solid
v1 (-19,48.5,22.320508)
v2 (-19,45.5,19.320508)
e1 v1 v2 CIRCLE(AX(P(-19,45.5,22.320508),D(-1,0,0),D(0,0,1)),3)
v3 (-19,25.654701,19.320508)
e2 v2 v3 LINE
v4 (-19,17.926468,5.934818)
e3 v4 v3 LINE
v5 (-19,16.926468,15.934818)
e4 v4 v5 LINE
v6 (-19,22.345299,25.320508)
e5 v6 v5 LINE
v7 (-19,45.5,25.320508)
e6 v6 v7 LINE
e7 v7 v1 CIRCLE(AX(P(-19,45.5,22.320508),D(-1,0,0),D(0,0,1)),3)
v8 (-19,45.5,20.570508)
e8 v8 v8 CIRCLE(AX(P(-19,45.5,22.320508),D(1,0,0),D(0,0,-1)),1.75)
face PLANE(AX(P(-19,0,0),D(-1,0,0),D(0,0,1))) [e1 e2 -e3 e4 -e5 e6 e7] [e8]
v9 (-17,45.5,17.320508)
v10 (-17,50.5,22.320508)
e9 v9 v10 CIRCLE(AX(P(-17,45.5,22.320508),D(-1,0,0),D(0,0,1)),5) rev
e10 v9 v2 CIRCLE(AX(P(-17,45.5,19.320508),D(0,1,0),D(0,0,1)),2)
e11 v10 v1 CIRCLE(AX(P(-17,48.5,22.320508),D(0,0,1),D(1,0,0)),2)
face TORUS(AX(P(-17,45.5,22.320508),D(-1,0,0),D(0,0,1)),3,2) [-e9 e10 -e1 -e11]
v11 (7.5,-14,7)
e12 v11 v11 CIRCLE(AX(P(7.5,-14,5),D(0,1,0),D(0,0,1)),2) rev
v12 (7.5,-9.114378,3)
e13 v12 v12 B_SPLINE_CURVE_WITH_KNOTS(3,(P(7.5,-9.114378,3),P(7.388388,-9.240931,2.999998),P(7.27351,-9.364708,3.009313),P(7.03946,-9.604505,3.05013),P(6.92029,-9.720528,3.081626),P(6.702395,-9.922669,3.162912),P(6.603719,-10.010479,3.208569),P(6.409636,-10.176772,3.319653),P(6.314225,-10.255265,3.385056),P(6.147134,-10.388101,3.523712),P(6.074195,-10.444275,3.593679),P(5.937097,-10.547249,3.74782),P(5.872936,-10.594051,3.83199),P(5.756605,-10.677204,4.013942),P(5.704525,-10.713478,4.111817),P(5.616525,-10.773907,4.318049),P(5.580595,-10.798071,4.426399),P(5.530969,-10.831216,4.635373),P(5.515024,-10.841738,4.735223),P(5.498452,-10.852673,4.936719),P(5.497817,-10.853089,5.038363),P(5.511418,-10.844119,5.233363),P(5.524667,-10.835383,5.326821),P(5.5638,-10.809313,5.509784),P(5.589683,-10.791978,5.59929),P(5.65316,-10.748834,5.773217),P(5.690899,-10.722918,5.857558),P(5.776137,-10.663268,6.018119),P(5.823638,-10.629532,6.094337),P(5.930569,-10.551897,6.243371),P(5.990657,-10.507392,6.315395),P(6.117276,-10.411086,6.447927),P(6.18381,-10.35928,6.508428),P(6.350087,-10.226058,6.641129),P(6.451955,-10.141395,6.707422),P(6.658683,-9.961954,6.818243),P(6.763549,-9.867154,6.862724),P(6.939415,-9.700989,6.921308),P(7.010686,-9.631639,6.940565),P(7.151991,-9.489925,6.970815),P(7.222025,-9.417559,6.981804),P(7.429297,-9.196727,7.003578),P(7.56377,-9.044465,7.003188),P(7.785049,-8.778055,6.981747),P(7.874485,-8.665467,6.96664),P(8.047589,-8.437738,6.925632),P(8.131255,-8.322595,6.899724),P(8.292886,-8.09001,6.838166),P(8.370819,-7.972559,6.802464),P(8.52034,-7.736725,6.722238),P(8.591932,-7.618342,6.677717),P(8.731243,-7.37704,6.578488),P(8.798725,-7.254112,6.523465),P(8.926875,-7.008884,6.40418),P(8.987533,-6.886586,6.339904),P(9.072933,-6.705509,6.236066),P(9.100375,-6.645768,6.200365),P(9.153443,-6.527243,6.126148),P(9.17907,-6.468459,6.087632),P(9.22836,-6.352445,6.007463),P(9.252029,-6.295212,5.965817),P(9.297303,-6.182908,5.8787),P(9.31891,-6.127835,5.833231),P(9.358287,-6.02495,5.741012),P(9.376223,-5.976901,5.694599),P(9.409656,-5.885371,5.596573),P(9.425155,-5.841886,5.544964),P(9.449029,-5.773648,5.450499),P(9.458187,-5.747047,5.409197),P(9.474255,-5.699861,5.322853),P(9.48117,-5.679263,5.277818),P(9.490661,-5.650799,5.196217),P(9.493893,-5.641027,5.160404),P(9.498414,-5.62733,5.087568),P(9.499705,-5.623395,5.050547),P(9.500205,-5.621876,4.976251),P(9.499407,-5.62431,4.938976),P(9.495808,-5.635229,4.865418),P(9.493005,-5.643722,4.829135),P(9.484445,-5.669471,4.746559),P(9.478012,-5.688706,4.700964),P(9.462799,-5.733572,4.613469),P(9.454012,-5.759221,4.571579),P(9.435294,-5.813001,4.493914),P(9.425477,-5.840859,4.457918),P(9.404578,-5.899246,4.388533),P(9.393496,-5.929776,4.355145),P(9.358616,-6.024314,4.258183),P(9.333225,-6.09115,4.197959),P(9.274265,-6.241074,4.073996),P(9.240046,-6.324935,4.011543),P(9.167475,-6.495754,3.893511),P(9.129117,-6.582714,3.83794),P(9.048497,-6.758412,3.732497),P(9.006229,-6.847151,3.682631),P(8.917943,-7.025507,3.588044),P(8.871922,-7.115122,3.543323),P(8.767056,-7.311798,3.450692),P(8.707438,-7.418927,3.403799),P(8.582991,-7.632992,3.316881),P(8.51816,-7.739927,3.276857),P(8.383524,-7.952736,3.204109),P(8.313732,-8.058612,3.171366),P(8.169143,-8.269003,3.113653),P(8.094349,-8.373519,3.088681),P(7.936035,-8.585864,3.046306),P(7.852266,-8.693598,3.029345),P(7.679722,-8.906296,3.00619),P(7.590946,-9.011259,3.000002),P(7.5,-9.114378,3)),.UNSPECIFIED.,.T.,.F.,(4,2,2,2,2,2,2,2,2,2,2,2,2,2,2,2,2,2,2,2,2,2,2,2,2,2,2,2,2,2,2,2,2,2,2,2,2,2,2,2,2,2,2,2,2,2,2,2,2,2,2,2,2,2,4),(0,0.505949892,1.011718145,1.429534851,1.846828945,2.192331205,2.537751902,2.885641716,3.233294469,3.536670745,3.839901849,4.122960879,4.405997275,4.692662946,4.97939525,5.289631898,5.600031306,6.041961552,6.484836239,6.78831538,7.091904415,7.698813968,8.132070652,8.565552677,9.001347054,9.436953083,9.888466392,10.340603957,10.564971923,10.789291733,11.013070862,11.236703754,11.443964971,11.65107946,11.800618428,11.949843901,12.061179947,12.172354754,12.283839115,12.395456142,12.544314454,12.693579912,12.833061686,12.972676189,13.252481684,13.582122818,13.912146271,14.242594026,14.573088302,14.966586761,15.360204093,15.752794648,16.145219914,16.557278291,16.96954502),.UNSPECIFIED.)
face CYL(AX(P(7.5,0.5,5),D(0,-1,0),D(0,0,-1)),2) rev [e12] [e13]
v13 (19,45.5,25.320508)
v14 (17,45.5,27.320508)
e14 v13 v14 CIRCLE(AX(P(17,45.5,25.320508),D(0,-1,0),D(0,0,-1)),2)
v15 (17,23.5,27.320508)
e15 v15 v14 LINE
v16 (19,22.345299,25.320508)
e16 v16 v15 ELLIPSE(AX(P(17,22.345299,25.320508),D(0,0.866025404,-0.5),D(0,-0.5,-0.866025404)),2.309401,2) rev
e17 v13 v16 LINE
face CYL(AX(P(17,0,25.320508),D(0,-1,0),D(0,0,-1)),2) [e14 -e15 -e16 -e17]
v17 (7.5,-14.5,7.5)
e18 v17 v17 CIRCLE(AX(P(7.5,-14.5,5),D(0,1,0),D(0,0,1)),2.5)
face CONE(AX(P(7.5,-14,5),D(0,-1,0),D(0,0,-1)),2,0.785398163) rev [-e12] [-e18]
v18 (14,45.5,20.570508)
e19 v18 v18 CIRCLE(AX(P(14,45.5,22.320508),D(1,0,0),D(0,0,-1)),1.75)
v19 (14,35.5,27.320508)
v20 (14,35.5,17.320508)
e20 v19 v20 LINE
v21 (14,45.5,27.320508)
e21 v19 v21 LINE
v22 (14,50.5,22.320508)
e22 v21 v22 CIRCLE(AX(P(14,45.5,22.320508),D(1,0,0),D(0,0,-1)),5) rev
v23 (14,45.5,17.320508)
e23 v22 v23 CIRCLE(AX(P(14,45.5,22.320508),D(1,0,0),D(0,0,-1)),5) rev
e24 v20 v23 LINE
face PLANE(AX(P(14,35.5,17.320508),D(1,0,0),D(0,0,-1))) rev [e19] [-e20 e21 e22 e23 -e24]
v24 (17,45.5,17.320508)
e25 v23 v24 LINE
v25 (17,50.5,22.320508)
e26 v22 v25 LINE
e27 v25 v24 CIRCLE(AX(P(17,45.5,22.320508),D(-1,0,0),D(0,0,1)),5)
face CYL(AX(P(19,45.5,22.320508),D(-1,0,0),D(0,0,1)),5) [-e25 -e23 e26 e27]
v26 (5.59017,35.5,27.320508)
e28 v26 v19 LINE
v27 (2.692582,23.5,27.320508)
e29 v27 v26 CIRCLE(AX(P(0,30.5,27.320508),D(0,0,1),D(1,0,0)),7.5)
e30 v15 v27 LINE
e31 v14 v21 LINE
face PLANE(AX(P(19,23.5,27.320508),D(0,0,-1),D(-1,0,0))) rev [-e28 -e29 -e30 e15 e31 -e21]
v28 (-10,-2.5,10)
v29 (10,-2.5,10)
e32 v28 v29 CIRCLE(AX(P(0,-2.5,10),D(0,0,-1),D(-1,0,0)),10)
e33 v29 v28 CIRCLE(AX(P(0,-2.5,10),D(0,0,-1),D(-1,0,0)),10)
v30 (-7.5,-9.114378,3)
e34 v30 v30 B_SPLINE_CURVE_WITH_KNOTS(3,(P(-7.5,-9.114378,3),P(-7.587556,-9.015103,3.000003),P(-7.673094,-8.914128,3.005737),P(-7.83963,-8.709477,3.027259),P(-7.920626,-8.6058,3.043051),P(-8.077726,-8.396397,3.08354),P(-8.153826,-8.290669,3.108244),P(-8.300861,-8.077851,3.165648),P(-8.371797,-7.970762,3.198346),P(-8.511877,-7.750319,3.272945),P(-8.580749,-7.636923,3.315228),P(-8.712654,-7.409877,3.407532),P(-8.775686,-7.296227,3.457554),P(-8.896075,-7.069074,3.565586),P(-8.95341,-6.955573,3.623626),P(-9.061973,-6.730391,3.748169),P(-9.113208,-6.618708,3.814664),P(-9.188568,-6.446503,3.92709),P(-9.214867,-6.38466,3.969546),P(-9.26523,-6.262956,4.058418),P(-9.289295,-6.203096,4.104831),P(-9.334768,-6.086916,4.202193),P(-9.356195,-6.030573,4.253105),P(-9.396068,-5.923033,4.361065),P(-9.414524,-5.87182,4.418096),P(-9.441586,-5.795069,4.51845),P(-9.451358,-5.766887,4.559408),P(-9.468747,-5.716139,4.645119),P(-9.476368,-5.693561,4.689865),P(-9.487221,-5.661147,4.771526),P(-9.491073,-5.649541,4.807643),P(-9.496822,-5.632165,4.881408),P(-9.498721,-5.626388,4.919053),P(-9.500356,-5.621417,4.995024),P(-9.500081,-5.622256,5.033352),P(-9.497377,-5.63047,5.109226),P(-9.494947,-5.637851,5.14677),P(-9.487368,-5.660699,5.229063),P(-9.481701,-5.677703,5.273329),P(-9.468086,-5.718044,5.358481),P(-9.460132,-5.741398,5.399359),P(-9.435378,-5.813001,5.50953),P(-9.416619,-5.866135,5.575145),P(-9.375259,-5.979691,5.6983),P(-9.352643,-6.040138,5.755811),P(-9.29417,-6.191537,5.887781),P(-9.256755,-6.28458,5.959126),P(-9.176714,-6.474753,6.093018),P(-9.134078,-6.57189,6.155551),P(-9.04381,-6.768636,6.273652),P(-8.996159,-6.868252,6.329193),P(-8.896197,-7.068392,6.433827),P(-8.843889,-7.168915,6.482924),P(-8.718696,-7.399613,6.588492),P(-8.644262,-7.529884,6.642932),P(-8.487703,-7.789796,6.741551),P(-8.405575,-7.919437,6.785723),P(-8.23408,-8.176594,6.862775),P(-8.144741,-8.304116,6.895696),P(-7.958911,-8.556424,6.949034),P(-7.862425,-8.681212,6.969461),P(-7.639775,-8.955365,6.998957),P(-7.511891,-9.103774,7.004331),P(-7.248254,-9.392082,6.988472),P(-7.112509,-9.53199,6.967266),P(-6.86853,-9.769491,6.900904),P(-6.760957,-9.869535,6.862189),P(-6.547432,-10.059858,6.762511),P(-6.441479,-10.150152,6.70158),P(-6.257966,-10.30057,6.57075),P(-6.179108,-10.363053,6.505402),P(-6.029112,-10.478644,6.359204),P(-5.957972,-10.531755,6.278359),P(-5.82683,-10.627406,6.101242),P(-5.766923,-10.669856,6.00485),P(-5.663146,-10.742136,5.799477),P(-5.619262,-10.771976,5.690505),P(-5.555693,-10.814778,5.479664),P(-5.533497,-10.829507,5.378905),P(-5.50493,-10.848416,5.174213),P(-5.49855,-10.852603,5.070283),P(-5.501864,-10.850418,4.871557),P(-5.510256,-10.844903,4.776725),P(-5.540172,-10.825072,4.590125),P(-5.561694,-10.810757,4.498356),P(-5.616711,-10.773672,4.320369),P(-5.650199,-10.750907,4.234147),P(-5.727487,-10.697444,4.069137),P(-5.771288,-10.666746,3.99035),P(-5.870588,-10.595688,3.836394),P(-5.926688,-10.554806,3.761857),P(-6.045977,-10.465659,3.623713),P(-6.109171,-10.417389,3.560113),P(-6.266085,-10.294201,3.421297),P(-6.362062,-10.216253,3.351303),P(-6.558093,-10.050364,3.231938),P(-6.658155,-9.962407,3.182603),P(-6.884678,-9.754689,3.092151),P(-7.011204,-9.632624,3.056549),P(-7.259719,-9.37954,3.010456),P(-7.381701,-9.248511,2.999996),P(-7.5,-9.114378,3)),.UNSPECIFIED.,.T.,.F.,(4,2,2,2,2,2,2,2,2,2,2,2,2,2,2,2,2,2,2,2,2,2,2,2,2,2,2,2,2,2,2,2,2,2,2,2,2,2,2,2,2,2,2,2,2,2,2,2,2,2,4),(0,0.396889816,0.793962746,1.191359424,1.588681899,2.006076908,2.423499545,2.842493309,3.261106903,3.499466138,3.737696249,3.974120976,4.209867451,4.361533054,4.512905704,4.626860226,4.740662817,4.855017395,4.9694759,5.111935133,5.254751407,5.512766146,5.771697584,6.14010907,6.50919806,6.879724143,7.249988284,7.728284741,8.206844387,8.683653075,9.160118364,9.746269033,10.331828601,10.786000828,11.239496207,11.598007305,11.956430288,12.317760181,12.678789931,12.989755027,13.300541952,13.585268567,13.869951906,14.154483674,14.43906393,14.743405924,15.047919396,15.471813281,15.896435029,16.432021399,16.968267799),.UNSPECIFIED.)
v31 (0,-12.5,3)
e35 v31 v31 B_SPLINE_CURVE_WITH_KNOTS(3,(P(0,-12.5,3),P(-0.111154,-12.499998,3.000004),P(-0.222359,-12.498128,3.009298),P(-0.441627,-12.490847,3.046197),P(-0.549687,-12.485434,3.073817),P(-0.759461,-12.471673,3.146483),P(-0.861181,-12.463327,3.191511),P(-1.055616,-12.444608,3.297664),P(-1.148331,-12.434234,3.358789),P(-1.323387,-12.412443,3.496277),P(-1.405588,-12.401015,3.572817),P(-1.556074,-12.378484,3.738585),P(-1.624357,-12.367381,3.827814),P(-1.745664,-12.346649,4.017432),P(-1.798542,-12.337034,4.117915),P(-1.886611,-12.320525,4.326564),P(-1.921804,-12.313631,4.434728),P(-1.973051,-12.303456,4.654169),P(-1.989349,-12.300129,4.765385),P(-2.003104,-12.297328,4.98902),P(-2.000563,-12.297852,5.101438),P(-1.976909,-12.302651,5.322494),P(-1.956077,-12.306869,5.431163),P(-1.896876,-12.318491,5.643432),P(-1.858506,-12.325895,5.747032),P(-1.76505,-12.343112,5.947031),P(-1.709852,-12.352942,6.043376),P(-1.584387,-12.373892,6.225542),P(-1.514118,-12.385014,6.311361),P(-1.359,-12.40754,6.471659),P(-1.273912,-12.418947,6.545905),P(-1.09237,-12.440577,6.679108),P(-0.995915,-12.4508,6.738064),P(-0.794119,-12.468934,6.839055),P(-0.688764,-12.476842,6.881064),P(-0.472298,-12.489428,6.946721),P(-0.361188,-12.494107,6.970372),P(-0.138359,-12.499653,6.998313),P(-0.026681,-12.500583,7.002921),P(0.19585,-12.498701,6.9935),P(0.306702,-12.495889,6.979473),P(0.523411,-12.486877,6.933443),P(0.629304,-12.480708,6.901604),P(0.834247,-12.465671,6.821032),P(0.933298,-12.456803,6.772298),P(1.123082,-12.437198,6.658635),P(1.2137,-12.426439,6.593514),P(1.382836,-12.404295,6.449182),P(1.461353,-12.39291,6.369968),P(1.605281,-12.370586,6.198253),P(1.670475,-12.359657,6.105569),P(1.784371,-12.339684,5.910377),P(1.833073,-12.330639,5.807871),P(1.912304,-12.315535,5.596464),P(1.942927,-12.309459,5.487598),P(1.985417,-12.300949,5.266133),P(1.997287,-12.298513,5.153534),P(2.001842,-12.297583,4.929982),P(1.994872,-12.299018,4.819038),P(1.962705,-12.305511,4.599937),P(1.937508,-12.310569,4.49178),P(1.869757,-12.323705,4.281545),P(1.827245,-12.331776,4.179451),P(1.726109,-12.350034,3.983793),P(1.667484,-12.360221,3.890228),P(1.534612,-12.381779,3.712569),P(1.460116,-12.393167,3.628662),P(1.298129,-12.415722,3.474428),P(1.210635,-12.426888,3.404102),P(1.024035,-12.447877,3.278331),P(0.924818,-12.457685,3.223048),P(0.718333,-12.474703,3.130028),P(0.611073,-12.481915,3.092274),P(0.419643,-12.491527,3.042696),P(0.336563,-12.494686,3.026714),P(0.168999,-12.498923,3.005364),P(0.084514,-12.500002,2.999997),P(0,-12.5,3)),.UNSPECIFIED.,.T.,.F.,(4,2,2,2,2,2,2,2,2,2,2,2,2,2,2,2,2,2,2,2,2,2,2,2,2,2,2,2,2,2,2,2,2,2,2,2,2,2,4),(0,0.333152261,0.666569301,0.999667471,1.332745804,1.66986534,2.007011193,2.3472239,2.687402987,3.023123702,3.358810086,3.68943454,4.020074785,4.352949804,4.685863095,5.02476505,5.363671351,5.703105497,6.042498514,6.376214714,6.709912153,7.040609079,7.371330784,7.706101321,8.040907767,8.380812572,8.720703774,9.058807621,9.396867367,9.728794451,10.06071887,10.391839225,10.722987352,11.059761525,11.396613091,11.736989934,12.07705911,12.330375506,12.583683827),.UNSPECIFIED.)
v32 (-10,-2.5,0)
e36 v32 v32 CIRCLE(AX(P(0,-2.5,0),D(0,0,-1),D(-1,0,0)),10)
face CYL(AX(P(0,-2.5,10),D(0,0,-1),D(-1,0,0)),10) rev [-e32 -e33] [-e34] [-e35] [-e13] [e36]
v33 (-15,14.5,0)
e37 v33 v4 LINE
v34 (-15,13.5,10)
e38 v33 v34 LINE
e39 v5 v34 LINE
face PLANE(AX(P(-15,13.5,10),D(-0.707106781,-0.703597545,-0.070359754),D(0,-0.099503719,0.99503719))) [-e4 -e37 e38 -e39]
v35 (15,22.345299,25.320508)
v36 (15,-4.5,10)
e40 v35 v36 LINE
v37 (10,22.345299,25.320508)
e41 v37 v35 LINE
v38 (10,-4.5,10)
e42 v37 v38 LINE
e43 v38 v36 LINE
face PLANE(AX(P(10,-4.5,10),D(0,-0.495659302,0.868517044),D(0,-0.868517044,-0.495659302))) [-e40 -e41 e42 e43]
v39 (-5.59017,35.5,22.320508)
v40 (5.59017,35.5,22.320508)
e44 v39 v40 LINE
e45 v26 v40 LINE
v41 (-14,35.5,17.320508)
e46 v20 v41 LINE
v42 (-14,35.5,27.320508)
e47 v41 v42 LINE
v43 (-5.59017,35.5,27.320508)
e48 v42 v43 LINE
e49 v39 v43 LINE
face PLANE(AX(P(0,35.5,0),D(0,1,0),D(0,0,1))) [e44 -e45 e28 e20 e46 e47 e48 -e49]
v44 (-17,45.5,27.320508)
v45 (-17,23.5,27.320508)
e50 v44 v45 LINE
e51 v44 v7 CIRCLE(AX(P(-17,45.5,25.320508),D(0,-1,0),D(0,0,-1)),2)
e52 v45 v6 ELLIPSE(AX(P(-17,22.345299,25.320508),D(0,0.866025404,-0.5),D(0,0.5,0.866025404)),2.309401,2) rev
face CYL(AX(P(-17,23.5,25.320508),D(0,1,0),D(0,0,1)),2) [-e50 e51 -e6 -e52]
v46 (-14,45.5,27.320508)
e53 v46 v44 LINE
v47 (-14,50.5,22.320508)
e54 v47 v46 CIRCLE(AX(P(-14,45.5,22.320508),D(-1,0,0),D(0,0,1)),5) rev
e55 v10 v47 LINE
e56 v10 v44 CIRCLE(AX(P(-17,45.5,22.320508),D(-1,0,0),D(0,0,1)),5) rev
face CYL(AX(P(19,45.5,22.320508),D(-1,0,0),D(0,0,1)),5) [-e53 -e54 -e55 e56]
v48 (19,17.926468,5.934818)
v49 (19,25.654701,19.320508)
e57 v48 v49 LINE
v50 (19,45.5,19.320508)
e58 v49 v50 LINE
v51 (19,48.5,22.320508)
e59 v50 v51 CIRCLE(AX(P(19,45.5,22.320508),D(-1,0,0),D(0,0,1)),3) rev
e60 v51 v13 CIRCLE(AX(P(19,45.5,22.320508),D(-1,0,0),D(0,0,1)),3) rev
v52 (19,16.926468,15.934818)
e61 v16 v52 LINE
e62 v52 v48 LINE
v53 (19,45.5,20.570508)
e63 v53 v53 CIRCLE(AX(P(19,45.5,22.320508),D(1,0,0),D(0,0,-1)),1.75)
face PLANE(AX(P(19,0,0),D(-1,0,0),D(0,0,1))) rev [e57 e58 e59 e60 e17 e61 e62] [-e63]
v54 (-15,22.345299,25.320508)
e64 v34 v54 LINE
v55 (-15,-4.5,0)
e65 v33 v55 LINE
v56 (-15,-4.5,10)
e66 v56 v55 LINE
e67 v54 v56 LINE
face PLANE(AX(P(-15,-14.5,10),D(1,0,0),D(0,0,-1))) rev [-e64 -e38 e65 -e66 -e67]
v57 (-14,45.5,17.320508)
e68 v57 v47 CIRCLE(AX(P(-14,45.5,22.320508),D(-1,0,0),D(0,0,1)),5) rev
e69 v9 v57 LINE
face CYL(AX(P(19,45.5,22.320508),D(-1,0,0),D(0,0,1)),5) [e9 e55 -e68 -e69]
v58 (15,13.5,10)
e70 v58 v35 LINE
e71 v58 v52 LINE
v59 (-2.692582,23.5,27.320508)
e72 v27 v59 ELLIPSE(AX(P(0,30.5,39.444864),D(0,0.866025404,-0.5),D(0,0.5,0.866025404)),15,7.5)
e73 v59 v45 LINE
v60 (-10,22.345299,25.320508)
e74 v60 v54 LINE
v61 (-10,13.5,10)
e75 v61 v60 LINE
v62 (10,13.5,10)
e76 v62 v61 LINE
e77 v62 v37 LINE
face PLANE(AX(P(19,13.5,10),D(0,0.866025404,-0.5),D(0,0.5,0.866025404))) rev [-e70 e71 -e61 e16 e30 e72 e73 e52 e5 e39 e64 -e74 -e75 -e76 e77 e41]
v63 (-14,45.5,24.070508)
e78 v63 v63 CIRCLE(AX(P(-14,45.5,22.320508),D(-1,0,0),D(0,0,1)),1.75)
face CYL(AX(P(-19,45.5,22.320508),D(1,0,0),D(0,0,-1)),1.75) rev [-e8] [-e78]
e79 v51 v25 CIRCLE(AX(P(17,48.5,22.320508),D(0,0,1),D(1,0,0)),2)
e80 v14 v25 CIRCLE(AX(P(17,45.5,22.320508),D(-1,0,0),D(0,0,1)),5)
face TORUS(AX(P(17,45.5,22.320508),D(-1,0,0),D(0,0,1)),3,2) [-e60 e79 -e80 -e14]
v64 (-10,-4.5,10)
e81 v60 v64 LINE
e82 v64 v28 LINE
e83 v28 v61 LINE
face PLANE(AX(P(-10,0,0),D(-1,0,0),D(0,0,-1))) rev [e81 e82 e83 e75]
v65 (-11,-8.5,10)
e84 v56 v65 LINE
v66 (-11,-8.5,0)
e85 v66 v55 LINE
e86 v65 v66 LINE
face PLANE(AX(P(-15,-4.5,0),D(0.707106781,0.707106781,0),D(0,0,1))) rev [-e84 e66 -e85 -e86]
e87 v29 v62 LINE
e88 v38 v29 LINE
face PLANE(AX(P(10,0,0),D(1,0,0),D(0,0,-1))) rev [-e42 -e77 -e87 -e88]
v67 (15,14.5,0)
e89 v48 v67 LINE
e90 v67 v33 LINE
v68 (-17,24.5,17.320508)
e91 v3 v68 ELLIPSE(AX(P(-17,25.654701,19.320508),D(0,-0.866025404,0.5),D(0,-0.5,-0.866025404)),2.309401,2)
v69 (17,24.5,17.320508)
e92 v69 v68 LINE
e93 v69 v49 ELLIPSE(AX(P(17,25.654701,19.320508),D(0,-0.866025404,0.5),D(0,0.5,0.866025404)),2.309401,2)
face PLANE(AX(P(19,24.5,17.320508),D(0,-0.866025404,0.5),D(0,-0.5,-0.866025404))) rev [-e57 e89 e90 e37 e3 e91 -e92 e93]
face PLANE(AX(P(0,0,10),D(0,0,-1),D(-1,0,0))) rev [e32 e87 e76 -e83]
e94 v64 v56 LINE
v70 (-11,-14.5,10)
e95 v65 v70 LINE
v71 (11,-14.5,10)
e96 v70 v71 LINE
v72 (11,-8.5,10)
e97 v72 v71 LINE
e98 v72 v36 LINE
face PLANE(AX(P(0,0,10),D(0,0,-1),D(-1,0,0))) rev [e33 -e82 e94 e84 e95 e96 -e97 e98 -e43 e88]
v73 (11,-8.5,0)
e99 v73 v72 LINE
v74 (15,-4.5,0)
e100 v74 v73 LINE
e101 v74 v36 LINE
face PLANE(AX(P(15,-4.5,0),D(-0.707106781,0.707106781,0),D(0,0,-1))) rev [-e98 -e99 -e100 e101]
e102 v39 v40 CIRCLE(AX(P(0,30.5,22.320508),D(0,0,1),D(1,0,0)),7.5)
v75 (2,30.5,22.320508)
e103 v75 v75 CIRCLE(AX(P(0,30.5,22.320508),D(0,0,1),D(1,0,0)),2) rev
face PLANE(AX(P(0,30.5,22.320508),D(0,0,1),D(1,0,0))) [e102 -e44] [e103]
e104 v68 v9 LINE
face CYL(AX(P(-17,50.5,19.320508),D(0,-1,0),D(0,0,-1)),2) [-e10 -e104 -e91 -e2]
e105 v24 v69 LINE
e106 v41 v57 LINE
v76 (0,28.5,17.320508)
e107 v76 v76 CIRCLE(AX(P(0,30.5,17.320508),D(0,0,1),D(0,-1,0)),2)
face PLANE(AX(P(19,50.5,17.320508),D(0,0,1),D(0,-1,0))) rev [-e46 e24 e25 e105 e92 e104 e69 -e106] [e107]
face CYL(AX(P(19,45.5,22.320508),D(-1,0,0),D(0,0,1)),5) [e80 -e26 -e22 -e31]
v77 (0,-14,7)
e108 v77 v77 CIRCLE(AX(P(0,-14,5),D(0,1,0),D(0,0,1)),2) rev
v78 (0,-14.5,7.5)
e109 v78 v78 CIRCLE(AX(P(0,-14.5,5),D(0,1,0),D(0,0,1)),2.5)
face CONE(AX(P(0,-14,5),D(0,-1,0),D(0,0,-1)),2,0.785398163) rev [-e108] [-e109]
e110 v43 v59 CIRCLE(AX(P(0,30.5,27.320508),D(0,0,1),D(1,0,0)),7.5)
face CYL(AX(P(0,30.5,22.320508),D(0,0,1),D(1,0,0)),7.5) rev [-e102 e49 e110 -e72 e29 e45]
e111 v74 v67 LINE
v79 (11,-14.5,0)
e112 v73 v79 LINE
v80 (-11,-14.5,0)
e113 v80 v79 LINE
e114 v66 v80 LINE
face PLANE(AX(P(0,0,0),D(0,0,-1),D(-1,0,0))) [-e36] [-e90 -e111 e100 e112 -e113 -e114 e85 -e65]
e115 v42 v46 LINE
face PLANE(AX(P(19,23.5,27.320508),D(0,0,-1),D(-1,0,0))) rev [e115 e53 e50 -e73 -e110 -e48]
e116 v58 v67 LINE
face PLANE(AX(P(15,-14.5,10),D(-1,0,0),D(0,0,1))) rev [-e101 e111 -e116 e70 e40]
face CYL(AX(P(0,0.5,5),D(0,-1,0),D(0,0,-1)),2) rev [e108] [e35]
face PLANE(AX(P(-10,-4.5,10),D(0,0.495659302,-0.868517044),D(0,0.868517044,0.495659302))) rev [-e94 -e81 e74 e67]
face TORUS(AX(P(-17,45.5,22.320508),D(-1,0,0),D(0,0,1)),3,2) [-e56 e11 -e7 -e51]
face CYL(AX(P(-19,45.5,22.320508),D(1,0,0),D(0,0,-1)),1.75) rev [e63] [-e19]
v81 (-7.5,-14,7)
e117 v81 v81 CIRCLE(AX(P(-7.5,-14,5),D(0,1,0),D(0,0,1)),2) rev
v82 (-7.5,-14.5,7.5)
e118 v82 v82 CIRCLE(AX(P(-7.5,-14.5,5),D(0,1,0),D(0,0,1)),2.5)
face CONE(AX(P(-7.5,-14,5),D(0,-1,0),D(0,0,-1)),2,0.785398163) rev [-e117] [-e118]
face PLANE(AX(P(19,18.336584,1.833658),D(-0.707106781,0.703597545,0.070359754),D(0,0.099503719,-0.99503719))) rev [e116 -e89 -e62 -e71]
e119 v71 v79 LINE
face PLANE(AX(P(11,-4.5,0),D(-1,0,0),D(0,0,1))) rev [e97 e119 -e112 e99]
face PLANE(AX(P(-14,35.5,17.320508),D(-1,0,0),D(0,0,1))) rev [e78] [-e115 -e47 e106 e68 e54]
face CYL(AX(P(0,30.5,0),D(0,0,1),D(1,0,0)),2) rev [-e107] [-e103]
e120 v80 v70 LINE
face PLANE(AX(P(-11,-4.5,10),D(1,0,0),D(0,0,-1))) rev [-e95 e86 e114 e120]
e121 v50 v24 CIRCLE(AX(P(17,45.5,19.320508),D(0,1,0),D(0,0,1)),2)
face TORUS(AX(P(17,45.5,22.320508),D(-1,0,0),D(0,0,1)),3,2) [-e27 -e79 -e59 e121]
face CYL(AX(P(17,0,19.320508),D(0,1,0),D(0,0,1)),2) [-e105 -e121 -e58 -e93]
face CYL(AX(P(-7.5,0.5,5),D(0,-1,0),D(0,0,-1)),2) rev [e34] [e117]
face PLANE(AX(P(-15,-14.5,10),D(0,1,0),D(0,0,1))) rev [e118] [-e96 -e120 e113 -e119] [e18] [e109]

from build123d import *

# Parameters (mm, degrees)
SKETCH1_W           = 30
SKETCH1_H           = 29
BOSS_EXTRUDE1_DEPTH = 10
SKETCH2_W           = 4
SKETCH2_H           = 10
CUT_EXTRUDE1_DEPTH  = 10
CHAMFER1_SIZE       = 4
SKETCH3_R           = 2
CUT_EXTRUDE2_DEPTH  = 15
CHAMFER2_SIZE       = 0.5
SKETCH4_R           = 10
CUT_EXTRUDE3_DEPTH  = 24.135470603
BOSS_EXTRUDE2_DEPTH = 19
CHAMFER3_SIZE       = 4
SKETCH6_W           = 28
SKETCH6_H           = 10
CUT_EXTRUDE4_DEPTH  = 15
FILLET1_R           = 5
SKETCH7_R           = 1.75
CUT_EXTRUDE5_DEPTH  = 69.85245211
FILLET2_R           = 2
SKETCH8_R           = 2
CUT_EXTRUDE6_DEPTH  = 61.478592634
SKETCH9_R           = 7.5
CUT_EXTRUDE7_DEPTH  = 5
BOSS_EXTRUDE3_DEPTH = 5


with BuildPart() as part:
    # Sketch1 → Boss-Extrude1 (new body)
    with BuildSketch(Plane.XY):
        Rectangle(SKETCH1_W, SKETCH1_H)
    extrude(amount=BOSS_EXTRUDE1_DEPTH)

    # Sketch2 → Cut-Extrude1 (cut)
    with BuildSketch(Plane.XZ.offset(14.5)):
        with Locations((-13, 5)):
            Rectangle(SKETCH2_W, SKETCH2_H)
        with Locations((13, 5)):
            Rectangle(SKETCH2_W, SKETCH2_H)
    extrude(amount=-CUT_EXTRUDE1_DEPTH, mode=Mode.SUBTRACT)

    # Chamfer1
    chamfer1_edges = [part.edges().sort_by_distance(p)[0] for p in [
        (11, -4.5, 5),
        (-11, -4.5, 5),
    ]]
    chamfer(chamfer1_edges, length=CHAMFER1_SIZE - 0.0001)  # a hair under: the kernel refuses the full size

    # Sketch3 → Cut-Extrude2 (cut)
    with BuildSketch(Plane.XZ.offset(14.5)):
        with Locations(Location((-7.5, 5, 0), (0, 0, 270))):
            Circle(SKETCH3_R)
        with Locations(Location((0, 5, 0), (0, 0, 270))):
            Circle(SKETCH3_R)
        with Locations(Location((7.5, 5, 0), (0, 0, 270))):
            Circle(SKETCH3_R)
    extrude(amount=-CUT_EXTRUDE2_DEPTH, mode=Mode.SUBTRACT)

    # Chamfer2
    chamfer2_edges = [part.edges().sort_by_distance(p)[0] for p in [
        (-7.5, -14.5, 7),
        (0, -14.5, 7),
        (7.5, -14.5, 7),
    ]]
    chamfer(chamfer2_edges, length=CHAMFER2_SIZE)

    # Sketch4 → Cut-Extrude3 (cut, through all)
    with BuildSketch(Plane(origin=(0, 0, 0), x_dir=(-1, 0, 0), z_dir=(0, 0, -1))):
        with Locations((0, -2.5)):
            Circle(SKETCH4_R)
    extrude(amount=-CUT_EXTRUDE3_DEPTH, mode=Mode.SUBTRACT)

    # Sketch5 → Boss-Extrude2 (add, symmetric)
    with BuildSketch(Plane(origin=(0, 0, 0), x_dir=(0, 0, -1), z_dir=(1, 0, 0))):
        Polygon((-10, 13.5), (-27.320508076, 23.5), (-27.320508076, 50.5), (-17.320508076, 50.5), (-17.320508076, 24.5), (0, 14.5), align=None)
    extrude(amount=BOSS_EXTRUDE2_DEPTH, both=True)

    # Chamfer3
    chamfer3_edges = [part.edges().sort_by_distance(p)[0] for p in [
        (-19, 14, 5),
        (19, 14, 5),
    ]]
    chamfer(chamfer3_edges, length=CHAMFER3_SIZE - 0.0001)  # a hair under: the kernel refuses the full size

    # Sketch6 → Cut-Extrude4 (cut)
    with BuildSketch(Plane(origin=(0, 50.5, 0), x_dir=(1, 0, 0), z_dir=(0, 1, 0))):
        with Locations((0, -22.320508076)):
            Rectangle(SKETCH6_W, SKETCH6_H)
    extrude(amount=-CUT_EXTRUDE4_DEPTH, mode=Mode.SUBTRACT)

    # Fillet1
    fillet1_edges = [part.edges().sort_by_distance(p)[0] for p in [
        (16.5, 50.5, 17.320508076),
        (16.5, 50.5, 27.320508076),
        (-16.5, 50.5, 17.320508076),
        (-16.5, 50.5, 27.320508076),
    ]]
    fillet(fillet1_edges, radius=FILLET1_R - 0.0001)  # a hair under: the kernel refuses the full size

    # Sketch7 → Cut-Extrude5 (cut, through all)
    with BuildSketch(Plane(origin=(19, 0, 0), x_dir=(0, 0, -1), z_dir=(1, 0, 0))):
        with Locations((-22.320508076, 45.5)):
            Circle(SKETCH7_R)
    extrude(amount=-CUT_EXTRUDE5_DEPTH, mode=Mode.SUBTRACT)

    # Fillet2
    fillet2_edges = [part.edges().sort_by_distance(p)[0] for p in [
        (19, 34.50005, 27.320508076),
        (19, 49.035563195, 25.856071271),
        (19, 49.035563195, 18.78494488),
        (-19, 34.50005, 27.320508076),
        (-19, 49.035563195, 25.856071271),
        (-19, 49.035563195, 18.78494488),
        (-19, 35.00005, 17.320508076),
        (19, 35.00005, 17.320508076),
    ]]
    fillet(fillet2_edges, radius=FILLET2_R)

    # Sketch8 → Cut-Extrude6 (cut, through all)
    with BuildSketch(Plane.XY.offset(27.320508076)):
        with Locations((0, 30.5)):
            Circle(SKETCH8_R)
    extrude(amount=-CUT_EXTRUDE6_DEPTH, mode=Mode.SUBTRACT)

    # Sketch9 → Cut-Extrude7 (cut)
    with BuildSketch(Plane.XY.offset(27.320508076)):
        with Locations((0, 30.5)):
            Circle(SKETCH9_R)
    extrude(amount=-CUT_EXTRUDE7_DEPTH, mode=Mode.SUBTRACT)

    # Sketch10 → Boss-Extrude3 (add)
    with BuildSketch(Plane(origin=(15, 0, 0), x_dir=(0, 0, -1), z_dir=(1, 0, 0))):
        Polygon((-10, -4.5), (-25.320508076, 22.345299462), (-10, 13.5), align=None)
    boss_extrude3 = extrude(amount=-BOSS_EXTRUDE3_DEPTH)

    # Mirror1: Boss-Extrude3 across plane
    add(boss_extrude3.mirror(Plane(origin=(0, 0, 0), x_dir=(0, 0, 1), z_dir=(1, 0, 0))))


solid = part.part
